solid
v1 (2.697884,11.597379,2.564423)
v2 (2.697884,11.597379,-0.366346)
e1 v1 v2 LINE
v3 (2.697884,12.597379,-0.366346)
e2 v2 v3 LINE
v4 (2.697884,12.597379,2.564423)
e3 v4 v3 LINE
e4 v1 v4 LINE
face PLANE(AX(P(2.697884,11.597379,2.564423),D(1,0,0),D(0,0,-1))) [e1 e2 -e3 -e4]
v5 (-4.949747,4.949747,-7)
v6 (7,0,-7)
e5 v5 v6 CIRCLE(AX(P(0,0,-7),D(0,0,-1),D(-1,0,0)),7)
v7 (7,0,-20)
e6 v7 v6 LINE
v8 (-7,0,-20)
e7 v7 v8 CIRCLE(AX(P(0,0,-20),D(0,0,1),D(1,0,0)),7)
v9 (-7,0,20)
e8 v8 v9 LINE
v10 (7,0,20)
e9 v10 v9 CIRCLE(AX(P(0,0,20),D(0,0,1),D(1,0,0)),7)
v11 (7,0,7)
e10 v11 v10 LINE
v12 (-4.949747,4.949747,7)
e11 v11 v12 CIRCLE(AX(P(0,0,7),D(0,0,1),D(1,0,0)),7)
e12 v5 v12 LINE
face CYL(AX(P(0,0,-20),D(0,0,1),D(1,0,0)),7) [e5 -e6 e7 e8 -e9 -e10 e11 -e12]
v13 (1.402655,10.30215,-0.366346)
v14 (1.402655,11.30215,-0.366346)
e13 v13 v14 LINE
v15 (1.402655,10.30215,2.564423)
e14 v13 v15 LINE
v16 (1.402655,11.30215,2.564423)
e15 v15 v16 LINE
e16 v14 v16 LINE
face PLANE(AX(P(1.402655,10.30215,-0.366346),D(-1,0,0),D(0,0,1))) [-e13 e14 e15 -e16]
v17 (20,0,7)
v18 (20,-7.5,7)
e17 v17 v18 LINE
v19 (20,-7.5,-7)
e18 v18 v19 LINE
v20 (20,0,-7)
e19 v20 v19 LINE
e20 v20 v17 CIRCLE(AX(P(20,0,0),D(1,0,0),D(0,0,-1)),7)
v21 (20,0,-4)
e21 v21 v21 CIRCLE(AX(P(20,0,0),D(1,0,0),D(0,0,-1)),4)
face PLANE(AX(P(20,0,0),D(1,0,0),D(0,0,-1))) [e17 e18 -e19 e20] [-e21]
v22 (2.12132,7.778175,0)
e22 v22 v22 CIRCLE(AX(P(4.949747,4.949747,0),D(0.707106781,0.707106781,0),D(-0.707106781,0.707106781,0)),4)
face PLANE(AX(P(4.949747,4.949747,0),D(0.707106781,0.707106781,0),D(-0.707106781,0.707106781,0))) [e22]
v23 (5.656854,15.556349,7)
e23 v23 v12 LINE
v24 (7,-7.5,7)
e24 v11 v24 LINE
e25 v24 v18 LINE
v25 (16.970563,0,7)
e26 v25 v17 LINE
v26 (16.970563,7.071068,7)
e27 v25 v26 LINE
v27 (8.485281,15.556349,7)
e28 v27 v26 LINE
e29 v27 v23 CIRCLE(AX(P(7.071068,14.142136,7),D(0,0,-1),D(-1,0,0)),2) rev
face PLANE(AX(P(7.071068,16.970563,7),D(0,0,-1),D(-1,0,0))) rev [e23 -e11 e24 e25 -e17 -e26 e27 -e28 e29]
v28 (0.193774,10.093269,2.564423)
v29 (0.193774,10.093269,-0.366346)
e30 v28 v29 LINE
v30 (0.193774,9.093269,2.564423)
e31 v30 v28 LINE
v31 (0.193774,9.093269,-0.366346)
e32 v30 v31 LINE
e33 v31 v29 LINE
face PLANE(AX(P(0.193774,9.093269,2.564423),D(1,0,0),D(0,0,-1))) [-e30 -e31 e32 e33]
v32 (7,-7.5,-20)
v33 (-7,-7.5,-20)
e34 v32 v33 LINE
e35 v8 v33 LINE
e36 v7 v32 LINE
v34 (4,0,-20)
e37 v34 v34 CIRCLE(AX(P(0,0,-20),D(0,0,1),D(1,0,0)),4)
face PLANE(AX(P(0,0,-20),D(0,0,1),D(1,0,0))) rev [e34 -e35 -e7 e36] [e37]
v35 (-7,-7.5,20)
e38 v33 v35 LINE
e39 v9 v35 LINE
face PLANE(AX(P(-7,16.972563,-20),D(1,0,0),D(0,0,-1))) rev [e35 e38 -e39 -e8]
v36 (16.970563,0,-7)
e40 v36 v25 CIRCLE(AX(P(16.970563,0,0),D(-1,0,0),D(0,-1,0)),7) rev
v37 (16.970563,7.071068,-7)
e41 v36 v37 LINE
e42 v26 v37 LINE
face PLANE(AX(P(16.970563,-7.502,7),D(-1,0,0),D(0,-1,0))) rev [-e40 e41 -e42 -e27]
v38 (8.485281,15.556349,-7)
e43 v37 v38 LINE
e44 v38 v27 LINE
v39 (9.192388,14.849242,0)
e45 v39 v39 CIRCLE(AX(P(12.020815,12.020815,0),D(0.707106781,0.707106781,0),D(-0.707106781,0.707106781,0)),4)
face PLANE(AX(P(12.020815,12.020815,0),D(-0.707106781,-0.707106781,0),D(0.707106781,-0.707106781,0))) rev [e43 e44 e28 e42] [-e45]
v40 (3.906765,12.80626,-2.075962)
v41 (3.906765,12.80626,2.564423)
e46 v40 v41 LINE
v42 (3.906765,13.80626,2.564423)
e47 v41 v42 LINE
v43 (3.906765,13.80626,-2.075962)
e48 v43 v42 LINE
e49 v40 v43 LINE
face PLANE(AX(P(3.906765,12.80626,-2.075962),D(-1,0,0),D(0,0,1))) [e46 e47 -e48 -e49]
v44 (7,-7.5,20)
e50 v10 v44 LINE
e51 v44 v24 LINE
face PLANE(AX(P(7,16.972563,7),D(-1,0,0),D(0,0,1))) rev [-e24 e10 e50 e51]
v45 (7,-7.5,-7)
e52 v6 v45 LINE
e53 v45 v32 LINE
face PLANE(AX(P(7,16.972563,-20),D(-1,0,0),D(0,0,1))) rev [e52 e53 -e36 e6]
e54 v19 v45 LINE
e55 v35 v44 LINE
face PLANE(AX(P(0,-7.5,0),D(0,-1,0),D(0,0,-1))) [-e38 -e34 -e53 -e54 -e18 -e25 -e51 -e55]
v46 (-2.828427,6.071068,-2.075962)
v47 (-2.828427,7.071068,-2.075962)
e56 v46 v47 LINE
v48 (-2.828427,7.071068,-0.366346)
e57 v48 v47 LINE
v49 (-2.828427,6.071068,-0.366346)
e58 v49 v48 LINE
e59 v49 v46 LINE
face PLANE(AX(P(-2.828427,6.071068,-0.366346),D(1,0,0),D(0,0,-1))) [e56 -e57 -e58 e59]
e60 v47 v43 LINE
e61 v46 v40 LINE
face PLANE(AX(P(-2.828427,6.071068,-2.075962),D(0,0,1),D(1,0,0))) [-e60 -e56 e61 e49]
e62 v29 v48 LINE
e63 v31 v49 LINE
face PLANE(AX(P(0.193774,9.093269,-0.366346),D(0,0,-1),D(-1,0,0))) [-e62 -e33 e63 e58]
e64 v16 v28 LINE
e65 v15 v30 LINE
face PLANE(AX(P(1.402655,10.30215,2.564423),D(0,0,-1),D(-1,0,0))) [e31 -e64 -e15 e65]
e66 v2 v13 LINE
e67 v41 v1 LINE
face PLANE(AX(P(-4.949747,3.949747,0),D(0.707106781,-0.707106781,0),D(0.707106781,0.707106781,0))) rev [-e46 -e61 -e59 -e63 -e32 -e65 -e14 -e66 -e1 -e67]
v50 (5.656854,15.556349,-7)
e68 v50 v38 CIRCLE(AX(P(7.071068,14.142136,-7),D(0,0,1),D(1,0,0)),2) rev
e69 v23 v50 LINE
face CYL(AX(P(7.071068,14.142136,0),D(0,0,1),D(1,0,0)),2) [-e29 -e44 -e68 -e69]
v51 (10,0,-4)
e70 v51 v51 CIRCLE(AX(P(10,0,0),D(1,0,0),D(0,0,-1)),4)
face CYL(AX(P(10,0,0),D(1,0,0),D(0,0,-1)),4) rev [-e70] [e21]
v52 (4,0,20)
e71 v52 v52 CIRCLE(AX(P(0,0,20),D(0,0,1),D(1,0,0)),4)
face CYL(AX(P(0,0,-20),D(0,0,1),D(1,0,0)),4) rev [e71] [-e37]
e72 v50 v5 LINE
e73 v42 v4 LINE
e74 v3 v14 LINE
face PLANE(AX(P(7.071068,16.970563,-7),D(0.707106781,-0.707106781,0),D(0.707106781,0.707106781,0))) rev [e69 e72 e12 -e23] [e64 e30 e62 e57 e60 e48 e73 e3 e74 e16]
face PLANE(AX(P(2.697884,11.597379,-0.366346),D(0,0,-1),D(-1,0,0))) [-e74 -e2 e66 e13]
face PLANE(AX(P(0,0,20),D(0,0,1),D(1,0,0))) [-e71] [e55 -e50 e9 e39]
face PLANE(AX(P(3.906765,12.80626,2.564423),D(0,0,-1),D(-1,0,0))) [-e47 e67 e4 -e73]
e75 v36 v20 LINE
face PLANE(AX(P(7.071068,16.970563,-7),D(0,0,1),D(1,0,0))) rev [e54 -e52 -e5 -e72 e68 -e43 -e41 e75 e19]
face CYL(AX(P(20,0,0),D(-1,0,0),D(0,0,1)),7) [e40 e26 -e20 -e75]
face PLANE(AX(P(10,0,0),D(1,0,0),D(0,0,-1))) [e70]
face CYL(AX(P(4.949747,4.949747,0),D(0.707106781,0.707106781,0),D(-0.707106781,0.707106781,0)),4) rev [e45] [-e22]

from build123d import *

# Parameters (mm, degrees)
DODANIE_WYCI_GNI_CIE1_DEPTH      = 20
DODANIE_WYCI_GNI_CIE1_DEPTH_BACK = 20
SZKIC1_R                         = 7
SZKIC1_R_2                       = 4
DODANIE_WYCI_GNI_CIE2_DEPTH      = 10
DODANIE_WYCI_GNI_CIE2_DEPTH_BACK = 10
SZKIC2_R                         = 4
DODANIE_WYCI_GNI_CIE4_START      = -7
SZKIC3_W                         = 14
SZKIC3_H                         = 14
DODANIE_WYCI_GNI_CIE4_DEPTH      = 17
SZKIC9_R                         = 7
DODANIE_WYCI_GNI_CIE6_DEPTH      = 20
SZKIC4_R                         = 4
WYTNIJ_WYCI_GNI_CIE1_DEPTH       = 10
DODANIE_WYCI_GNI_CIE7_REACH      = 39.401
DODANIE_WYCI_GNI_CIE8_START      = -7
DODANIE_WYCI_GNI_CIE8_DEPTH      = 14
SZKIC11_R                        = 4
WYTNIJ_WYCI_GNI_CIE2_DEPTH       = 10
SZKIC12_R                        = 4
WYTNIJ_WYCI_GNI_CIE3_DEPTH       = 40.84971769
ZAOKR_GLENIE1_R                  = 2
WYTNIJ_WYCI_GNI_CIE4_DEPTH       = 1


with BuildPart() as part:
    # Szkic1 → Dodanie-wyciągnięcie1 (new, two sides: drawn at the far end of the back side and taken through both)
    with BuildSketch(Plane.XY.offset(-DODANIE_WYCI_GNI_CIE1_DEPTH_BACK)):
        Circle(SZKIC1_R)
        Circle(SZKIC1_R_2, mode=Mode.SUBTRACT)
    extrude(amount=DODANIE_WYCI_GNI_CIE1_DEPTH + DODANIE_WYCI_GNI_CIE1_DEPTH_BACK)

    # Szkic2 → Dodanie-wyciągnięcie2 (add, two sides: drawn at the far end of the back side and taken through both)
    with BuildSketch(Plane.XY.offset(-DODANIE_WYCI_GNI_CIE2_DEPTH_BACK)):
        Circle(SZKIC2_R)
    extrude(amount=DODANIE_WYCI_GNI_CIE2_DEPTH + DODANIE_WYCI_GNI_CIE2_DEPTH_BACK)

    # Szkic3 → Dodanie-wyciągnięcie4 (add)
    with BuildSketch(Plane(origin=(4.949747468, 4.949747468, 0), x_dir=(0, 0, 1), z_dir=(0.7071067811865438, 0.7071067811865512, 0)).offset(DODANIE_WYCI_GNI_CIE4_START)):
        Rectangle(SZKIC3_W, SZKIC3_H)
    extrude(amount=DODANIE_WYCI_GNI_CIE4_DEPTH)

    # Szkic9 → Dodanie-wyciągnięcie6 (add)
    with BuildSketch(Plane(origin=(0, 0, 0), x_dir=(0, 0, -1), z_dir=(1, 0, 0))):
        Circle(SZKIC9_R)
    extrude(amount=DODANIE_WYCI_GNI_CIE6_DEPTH)

    # Szkic4 → Wytnij-wyciągnięcie1 (cut)
    with BuildSketch(Plane(origin=(12.02081528, 12.02081528, 0), x_dir=(0, 0, -1), z_dir=(0.7071067811865438, 0.7071067811865513, 0))):
        with Locations(Location((0, 0, 0), (0, 0, 90))):
            Circle(SZKIC4_R)
    extrude(amount=-WYTNIJ_WYCI_GNI_CIE1_DEPTH, mode=Mode.SUBTRACT)

    # Szkic10 → Dodanie-wyciągnięcie7 (add, up to next)
    with BuildSketch(Plane(origin=(0, -7.5, 0), x_dir=(1, 0, 0), z_dir=(0, 1, 0)), mode=Mode.PRIVATE) as dodanie_wyci_gni_cie7_sk1:
        Polygon((-7, 20), (-7, -20), (7, -20), (7, -7), (20, -7), (20, 7), (7, 7), (7, 20), align=None)
    dodanie_wyci_gni_cie7_tool1 = extrude(dodanie_wyci_gni_cie7_sk1.sketch, amount=DODANIE_WYCI_GNI_CIE7_REACH, mode=Mode.PRIVATE) - part.part
    add(dodanie_wyci_gni_cie7_tool1.solids().sort_by_distance((3.311321, -7.5, 0))[0])

    # Dodanie-wyciągnięcie8: read off the stored shape, not the designer's step
    # Dodanie-wyciągnięcie8 outline → Dodanie-wyciągnięcie8 (add)
    with BuildSketch(Plane.XY.offset(DODANIE_WYCI_GNI_CIE8_START)):
        Polygon((16.970562748, -2), (16.970562748, 7.071067812), (9.899494937, 0), (8, -1.899494937), (8, -2), align=None)
    extrude(amount=DODANIE_WYCI_GNI_CIE8_DEPTH)

    # Szkic11 → Wytnij-wyciągnięcie2 (cut)
    with BuildSketch(Plane(origin=(20, 0, 0), x_dir=(0, 0, -1), z_dir=(1, 0, 0))):
        Circle(SZKIC11_R)
    extrude(amount=-WYTNIJ_WYCI_GNI_CIE2_DEPTH, mode=Mode.SUBTRACT)

    # Szkic12 → Wytnij-wyciągnięcie3 (cut, through all)
    with BuildSketch(Plane.XY.offset(10)):
        Circle(SZKIC12_R)
    extrude(amount=-WYTNIJ_WYCI_GNI_CIE3_DEPTH, mode=Mode.SUBTRACT)

    # Zaokrąglenie1
    zaokr_glenie1_edges = [part.edges().sort_by_distance(p)[0] for p in [
        (7.071067812, 16.970562748, 0),
    ]]
    fillet(zaokr_glenie1_edges, radius=ZAOKR_GLENIE1_R)

    # Szkic14 → Wytnij-wyciągnięcie4 (cut, along a direction that is not the sketch's normal)
    with BuildSketch(Plane(origin=(-4.949747468, 4.949747468, 0), x_dir=(0, 0, 1), z_dir=(-0.7071067811865513, 0.7071067811865438, 0))):
        Polygon((-2.075961538, 12.525), (2.564423077, 12.525), (2.564423077, 10.815384615), (-0.366346154, 10.815384615), (-0.366346154, 8.983653846), (2.564423077, 8.983653846), (2.564423077, 7.274038462), (-0.366346154, 7.274038462), (-0.366346154, 3), (-2.075961538, 3), align=None)
    extrude(amount=-WYTNIJ_WYCI_GNI_CIE4_DEPTH, dir=(0, 1, 0), mode=Mode.SUBTRACT)


solid = part.part
